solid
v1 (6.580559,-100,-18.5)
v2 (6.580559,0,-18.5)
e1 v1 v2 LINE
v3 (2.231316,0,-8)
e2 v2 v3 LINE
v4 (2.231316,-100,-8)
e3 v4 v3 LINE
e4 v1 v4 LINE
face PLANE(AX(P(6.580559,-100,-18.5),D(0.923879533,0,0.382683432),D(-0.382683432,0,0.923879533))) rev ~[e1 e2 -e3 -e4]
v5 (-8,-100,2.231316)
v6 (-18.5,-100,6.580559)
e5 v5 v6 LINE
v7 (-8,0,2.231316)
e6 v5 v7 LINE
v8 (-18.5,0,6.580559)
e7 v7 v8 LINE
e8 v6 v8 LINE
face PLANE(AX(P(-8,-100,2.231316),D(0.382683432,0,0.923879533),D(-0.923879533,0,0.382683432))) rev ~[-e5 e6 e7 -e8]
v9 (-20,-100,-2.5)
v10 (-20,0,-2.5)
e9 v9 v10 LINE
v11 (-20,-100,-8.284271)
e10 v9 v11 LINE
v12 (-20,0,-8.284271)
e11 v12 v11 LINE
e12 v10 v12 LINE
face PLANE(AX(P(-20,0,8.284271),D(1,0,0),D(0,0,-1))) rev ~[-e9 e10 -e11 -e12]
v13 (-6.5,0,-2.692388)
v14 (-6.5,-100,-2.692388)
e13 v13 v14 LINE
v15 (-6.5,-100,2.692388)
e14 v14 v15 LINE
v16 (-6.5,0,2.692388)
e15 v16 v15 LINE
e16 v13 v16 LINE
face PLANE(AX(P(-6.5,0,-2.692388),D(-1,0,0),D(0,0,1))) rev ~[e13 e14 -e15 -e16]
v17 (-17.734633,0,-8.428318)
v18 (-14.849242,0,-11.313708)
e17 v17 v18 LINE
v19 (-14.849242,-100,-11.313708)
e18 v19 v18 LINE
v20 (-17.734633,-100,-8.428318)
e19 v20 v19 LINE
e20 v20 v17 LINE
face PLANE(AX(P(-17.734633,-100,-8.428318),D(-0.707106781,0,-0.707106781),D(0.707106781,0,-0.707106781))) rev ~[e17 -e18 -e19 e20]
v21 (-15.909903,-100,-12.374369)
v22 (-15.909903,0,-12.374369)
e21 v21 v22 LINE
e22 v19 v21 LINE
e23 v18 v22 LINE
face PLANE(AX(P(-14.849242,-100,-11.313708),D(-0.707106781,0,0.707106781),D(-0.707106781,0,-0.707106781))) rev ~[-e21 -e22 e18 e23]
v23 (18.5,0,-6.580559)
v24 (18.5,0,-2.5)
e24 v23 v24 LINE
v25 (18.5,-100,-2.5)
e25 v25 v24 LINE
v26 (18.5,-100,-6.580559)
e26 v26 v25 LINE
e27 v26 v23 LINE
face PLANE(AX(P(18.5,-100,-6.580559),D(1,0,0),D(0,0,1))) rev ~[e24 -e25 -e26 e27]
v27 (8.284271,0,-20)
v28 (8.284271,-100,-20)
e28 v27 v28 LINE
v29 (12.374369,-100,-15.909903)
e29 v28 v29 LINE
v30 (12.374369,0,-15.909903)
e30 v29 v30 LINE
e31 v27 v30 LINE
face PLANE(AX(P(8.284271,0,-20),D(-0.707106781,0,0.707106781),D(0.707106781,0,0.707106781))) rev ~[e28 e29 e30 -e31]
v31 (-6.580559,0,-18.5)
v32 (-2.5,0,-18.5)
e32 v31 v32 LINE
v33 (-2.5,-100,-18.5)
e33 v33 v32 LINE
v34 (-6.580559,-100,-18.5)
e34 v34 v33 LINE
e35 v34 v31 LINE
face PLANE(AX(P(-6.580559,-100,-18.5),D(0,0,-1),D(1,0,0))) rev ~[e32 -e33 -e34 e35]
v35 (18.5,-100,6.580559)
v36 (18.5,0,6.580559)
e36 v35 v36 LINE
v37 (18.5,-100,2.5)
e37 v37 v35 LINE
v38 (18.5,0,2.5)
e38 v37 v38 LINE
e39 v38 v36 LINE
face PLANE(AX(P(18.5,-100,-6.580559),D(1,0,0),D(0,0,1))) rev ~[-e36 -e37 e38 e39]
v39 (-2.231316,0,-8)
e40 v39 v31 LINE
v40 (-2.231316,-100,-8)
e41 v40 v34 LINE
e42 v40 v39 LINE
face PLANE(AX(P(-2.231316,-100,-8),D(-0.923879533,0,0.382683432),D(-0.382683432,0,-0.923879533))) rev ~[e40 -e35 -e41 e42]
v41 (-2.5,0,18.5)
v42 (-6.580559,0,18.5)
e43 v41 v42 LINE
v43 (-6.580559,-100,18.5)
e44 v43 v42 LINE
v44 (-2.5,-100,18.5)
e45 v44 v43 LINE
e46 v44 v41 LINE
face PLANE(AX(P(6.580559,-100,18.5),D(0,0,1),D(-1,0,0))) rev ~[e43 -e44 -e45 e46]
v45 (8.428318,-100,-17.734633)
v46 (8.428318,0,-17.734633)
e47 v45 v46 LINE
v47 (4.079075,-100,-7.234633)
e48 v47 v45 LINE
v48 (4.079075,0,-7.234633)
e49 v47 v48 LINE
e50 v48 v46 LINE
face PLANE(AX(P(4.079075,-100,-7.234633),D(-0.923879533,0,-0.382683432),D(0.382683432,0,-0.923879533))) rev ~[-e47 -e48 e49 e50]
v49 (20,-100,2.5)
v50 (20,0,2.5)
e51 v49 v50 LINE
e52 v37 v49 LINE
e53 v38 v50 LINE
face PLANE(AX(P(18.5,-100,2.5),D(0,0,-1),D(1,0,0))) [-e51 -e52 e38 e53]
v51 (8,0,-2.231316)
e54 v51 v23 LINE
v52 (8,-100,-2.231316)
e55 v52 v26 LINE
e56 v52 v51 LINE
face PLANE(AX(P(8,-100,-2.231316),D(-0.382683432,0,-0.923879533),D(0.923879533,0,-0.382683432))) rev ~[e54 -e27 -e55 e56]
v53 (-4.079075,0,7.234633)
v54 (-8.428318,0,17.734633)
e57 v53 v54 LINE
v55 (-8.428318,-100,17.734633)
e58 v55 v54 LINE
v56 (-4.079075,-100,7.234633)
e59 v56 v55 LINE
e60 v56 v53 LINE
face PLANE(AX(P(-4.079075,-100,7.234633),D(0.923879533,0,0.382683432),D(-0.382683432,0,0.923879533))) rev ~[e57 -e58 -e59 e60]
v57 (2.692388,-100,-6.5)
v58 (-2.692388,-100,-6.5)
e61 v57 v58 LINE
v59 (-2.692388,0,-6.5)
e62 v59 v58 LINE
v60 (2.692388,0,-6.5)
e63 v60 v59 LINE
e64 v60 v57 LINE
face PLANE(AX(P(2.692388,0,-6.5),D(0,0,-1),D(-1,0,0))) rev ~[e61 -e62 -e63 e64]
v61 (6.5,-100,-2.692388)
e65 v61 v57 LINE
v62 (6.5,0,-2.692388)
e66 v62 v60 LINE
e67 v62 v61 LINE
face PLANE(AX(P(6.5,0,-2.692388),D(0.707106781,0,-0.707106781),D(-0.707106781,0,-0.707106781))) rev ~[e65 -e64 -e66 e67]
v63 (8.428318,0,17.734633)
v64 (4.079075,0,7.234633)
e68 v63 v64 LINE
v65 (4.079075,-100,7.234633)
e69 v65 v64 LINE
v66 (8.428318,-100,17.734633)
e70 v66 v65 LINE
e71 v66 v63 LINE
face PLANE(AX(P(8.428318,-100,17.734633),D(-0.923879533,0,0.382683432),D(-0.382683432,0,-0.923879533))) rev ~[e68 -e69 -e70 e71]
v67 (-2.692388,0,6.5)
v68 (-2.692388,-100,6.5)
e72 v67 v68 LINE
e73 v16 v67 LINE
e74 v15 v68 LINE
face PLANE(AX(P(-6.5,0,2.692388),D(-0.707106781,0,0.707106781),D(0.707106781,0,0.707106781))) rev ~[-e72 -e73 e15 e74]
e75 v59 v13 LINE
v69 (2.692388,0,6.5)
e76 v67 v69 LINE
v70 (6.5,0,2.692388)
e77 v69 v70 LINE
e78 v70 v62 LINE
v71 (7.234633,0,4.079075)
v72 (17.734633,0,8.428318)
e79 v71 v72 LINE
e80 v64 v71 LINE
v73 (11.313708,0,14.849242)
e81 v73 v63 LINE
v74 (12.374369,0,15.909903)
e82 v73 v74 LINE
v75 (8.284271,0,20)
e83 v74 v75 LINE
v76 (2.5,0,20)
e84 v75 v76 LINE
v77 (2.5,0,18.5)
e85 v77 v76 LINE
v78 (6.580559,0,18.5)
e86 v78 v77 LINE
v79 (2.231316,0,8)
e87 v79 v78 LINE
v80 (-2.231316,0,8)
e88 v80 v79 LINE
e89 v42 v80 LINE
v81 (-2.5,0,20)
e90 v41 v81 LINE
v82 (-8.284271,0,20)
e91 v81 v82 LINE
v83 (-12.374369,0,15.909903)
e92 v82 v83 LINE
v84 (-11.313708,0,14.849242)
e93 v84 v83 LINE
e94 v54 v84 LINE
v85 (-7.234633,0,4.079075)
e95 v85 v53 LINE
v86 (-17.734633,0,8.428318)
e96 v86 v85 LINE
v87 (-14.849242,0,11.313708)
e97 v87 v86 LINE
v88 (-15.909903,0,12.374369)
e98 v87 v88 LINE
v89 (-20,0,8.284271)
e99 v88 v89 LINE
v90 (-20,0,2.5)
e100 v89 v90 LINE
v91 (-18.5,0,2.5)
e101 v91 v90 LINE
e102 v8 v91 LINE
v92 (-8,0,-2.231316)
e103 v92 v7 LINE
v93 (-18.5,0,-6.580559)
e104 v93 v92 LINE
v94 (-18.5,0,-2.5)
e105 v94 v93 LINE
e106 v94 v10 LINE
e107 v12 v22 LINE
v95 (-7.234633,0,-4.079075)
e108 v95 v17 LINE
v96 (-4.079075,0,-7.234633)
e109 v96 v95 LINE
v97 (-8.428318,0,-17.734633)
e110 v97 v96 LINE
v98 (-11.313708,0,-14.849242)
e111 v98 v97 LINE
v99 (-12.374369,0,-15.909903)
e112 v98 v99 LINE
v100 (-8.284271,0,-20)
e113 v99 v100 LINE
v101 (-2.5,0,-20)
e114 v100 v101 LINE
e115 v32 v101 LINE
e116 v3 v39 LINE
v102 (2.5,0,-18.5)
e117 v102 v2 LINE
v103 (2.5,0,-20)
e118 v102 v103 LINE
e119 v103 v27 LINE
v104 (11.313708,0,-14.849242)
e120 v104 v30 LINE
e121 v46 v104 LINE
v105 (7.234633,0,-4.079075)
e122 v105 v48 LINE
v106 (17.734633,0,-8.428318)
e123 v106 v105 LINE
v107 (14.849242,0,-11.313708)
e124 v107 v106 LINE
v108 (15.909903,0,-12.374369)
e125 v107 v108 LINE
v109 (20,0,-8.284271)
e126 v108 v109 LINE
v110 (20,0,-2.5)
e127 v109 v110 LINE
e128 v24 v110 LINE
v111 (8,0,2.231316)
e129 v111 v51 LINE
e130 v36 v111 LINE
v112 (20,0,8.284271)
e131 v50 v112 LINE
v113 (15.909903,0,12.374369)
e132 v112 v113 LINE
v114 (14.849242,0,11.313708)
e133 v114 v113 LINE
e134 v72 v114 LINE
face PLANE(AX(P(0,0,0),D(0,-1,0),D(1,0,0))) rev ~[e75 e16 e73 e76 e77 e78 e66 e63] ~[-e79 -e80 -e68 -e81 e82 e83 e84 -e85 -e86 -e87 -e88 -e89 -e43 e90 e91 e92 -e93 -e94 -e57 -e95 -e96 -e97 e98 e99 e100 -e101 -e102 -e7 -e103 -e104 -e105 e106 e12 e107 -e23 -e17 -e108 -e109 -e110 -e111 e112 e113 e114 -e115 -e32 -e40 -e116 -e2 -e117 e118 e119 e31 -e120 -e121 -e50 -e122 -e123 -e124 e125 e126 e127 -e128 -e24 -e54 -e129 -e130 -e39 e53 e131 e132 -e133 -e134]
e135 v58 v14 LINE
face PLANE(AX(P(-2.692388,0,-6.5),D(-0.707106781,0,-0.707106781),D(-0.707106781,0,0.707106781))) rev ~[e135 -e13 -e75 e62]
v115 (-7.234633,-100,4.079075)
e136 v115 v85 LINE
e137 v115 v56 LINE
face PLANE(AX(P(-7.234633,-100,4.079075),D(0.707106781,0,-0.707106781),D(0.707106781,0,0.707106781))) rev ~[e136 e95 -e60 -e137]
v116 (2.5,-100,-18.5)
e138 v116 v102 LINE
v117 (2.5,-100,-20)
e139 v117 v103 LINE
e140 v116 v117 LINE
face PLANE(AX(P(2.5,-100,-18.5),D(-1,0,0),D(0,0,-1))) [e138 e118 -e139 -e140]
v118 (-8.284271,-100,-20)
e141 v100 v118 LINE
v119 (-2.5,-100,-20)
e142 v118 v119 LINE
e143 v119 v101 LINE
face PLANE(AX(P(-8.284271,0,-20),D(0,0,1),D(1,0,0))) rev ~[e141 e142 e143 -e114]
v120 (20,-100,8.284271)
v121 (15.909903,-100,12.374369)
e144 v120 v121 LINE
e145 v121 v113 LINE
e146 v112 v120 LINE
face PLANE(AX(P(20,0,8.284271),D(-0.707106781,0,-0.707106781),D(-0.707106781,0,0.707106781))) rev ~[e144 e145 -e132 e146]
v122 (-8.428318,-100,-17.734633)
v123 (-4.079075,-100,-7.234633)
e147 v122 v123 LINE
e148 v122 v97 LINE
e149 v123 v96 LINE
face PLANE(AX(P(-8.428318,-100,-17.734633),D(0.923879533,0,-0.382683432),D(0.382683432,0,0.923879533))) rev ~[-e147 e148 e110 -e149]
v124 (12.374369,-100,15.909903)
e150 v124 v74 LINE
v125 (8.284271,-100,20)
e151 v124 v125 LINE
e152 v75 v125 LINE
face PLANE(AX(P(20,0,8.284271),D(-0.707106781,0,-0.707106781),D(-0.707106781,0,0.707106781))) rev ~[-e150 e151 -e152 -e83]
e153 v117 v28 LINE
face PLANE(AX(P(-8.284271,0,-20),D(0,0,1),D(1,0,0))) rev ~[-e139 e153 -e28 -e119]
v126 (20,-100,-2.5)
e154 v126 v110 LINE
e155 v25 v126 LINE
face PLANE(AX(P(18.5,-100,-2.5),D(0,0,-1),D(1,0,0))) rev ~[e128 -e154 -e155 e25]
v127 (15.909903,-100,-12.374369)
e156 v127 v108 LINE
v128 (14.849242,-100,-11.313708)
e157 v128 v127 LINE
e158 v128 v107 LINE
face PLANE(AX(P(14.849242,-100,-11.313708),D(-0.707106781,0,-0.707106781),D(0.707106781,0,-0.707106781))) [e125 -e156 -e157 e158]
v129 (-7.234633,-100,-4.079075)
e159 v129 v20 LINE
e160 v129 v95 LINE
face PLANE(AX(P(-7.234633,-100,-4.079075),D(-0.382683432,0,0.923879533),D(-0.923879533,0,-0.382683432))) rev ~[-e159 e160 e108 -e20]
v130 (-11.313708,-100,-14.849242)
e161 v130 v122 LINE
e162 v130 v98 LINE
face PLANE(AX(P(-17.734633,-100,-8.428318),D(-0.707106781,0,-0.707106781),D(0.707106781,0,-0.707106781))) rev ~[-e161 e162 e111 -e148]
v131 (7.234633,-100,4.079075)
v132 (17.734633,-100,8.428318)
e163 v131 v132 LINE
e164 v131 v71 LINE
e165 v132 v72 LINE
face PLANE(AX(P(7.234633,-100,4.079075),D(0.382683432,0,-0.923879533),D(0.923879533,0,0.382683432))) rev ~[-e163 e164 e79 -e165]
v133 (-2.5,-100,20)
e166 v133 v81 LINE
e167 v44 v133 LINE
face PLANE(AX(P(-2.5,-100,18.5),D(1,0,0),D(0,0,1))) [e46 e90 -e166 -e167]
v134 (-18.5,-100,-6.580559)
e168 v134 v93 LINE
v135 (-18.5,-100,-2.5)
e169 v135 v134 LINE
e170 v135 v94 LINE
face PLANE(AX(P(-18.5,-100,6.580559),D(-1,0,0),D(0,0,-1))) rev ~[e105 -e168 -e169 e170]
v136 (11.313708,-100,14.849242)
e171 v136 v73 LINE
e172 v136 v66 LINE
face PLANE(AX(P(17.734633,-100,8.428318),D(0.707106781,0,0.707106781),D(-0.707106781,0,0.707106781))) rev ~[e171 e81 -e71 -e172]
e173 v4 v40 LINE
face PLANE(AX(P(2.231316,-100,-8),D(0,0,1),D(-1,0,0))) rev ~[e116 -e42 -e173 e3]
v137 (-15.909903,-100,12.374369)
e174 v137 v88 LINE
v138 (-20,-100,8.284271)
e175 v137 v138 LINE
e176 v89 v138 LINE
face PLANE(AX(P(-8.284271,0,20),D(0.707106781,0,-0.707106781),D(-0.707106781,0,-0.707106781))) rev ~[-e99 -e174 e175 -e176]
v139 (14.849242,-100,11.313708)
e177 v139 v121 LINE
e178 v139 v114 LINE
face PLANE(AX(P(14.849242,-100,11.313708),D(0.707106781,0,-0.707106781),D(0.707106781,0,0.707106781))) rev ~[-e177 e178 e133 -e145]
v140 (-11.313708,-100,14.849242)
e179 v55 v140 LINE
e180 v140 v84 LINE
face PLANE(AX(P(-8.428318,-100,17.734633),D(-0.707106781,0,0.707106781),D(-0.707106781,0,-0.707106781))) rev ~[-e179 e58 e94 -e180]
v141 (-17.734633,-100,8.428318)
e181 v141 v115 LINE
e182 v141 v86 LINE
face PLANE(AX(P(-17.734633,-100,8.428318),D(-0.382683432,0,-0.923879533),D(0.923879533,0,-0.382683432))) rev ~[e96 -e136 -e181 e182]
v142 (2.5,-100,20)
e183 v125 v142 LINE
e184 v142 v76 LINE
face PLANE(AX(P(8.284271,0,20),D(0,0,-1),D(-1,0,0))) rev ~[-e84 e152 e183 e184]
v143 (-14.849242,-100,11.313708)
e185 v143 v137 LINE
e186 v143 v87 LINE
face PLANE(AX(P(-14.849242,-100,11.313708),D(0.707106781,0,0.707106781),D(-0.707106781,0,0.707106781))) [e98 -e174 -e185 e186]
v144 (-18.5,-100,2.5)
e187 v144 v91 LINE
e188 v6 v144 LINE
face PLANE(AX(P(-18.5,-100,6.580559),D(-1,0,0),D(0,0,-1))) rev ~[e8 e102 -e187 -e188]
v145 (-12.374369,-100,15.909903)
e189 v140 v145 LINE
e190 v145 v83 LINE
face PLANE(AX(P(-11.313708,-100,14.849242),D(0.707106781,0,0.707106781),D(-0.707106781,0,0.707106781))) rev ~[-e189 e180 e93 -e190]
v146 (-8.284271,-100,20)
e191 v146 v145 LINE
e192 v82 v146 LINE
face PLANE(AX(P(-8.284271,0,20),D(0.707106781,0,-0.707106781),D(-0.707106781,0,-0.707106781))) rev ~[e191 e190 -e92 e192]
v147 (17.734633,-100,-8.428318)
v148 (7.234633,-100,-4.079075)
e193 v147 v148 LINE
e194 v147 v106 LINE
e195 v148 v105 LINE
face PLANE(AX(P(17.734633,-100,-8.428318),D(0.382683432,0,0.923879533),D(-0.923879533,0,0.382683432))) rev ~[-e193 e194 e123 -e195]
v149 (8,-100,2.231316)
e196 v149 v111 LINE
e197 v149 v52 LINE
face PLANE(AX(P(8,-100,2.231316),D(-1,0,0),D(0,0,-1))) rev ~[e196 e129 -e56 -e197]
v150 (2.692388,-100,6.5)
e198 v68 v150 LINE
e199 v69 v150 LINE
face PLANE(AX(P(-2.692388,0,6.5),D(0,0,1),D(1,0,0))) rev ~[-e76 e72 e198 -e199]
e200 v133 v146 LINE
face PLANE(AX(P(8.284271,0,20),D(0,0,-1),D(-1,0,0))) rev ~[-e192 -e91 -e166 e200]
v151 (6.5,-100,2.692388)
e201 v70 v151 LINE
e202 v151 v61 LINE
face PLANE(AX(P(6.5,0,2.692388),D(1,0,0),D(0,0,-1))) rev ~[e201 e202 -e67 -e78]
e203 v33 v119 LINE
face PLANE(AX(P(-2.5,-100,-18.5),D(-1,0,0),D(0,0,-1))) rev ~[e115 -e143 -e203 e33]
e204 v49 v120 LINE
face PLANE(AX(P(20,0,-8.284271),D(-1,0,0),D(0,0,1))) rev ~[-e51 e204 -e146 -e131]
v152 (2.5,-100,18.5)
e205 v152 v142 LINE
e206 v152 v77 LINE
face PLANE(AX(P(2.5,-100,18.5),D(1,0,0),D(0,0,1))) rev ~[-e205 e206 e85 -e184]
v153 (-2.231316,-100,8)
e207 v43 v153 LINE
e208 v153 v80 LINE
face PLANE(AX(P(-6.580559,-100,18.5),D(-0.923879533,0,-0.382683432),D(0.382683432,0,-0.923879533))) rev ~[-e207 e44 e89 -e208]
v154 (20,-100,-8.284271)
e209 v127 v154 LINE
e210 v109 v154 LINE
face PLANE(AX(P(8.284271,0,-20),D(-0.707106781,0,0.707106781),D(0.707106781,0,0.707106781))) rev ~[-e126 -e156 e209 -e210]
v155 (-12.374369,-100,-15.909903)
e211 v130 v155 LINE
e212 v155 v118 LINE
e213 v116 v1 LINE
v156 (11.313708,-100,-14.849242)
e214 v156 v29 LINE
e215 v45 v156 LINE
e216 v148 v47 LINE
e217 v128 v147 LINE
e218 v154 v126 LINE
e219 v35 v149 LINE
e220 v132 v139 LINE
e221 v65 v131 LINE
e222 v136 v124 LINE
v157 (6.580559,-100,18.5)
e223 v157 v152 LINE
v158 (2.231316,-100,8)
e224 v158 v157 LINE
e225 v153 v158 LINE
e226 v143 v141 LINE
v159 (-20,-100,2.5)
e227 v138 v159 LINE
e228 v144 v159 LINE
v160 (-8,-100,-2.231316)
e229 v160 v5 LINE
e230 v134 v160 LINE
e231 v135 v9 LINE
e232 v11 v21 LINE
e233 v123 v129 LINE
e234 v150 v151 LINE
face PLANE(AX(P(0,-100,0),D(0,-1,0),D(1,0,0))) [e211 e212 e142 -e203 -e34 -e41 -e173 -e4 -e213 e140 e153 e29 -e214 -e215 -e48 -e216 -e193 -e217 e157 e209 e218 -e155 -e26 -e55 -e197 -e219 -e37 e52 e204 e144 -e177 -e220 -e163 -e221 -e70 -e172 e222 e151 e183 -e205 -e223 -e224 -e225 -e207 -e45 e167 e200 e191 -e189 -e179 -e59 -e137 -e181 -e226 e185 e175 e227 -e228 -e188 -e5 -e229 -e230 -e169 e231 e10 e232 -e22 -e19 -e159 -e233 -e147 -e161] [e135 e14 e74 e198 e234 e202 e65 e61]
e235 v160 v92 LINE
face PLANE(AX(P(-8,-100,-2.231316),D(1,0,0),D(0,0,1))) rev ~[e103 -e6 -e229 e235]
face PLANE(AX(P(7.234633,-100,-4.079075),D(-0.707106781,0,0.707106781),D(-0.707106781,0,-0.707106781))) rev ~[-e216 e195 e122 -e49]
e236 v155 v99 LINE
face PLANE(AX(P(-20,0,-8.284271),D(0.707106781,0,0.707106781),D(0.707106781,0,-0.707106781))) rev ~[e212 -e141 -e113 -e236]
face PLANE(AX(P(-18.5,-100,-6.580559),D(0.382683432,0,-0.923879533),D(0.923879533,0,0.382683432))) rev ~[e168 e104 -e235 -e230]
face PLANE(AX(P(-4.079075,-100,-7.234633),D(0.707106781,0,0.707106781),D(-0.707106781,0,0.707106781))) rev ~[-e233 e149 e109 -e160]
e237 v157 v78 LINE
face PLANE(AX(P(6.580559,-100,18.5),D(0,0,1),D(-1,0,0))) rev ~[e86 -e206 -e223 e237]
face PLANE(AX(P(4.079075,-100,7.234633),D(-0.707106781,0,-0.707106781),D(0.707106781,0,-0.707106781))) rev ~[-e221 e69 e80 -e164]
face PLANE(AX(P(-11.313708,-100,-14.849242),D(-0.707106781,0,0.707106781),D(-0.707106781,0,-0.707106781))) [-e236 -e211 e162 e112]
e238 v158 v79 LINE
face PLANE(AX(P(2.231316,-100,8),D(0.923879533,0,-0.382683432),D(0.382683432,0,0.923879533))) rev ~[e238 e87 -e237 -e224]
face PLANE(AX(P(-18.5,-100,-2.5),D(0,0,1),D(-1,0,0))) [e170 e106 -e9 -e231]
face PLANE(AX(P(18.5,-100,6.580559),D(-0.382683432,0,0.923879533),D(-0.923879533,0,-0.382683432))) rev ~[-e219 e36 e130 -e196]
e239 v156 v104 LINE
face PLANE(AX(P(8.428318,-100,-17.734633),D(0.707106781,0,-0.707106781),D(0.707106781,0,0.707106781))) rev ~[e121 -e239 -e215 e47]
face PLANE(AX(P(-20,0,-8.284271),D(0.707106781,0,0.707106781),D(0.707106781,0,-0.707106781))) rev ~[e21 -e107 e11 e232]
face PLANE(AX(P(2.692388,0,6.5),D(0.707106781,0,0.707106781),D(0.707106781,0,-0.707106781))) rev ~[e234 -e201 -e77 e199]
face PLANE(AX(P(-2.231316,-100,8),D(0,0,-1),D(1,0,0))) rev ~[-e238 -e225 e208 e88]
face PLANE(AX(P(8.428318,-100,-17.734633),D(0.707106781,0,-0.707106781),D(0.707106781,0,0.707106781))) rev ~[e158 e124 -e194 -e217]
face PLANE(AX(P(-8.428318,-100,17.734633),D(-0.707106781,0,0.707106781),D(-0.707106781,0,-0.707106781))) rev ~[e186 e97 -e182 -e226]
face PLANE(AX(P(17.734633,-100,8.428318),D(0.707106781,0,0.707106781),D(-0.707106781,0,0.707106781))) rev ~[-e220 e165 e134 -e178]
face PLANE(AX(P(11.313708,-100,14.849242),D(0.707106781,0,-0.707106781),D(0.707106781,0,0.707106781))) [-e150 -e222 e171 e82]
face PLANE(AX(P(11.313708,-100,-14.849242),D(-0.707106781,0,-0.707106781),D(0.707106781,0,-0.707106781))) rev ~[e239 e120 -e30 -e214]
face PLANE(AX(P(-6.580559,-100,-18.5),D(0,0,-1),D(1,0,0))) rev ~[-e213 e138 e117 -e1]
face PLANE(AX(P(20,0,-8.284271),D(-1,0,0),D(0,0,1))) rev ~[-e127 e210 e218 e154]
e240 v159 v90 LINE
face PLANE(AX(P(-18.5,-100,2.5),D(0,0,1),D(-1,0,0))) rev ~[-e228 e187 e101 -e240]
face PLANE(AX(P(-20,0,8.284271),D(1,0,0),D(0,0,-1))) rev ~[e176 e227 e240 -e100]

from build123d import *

# Parameters (mm, degrees)
F1_DEPTH        = 100
F3_DEPTH        = 100.001
F3_COPIES_COUNT = 8
F4_W            = 5
F4_H            = 1.5
F5_DEPTH        = 100.001
F5_COPIES_COUNT = 8


# Not quite as in the source:
# - a pattern or mirror of a feature is missing from the dataset's text; its kind, count and spacing are read off the source's solid


with BuildPart() as f1:
    # F0 (on Front) → F1 (new body)
    with BuildSketch(Plane.XZ):
        Polygon((8.2842712475, 20), (-8.2842712475, 20), (-20, 8.2842712475), (-20, -8.2842712475), (-8.2842712475, -20), (8.2842712475, -20), (20, -8.2842712475), (20, 8.2842712475), align=None)
        Polygon((-6.5, 2.6923881554), (-2.6923881554, 6.5), (2.6923881554, 6.5), (6.5, 2.6923881554), (6.5, -2.6923881554), (2.6923881554, -6.5), (-2.6923881554, -6.5), (-6.5, -2.6923881554), align=None, mode=Mode.SUBTRACT)
    extrude(amount=F1_DEPTH)

    # F2 (on face) → F3 (cut, through all)
    with BuildSketch(Plane.XZ.offset(100)):
        Polygon((-6.5805587036, 18.5), (-2.2313162987, 8), (2.2313162987, 8), (6.5805587036, 18.5), align=None)
    f3 = extrude(amount=-F3_DEPTH, mode=Mode.SUBTRACT)

    # F3_copies: F3 ×8 about axis
    f3_copies_axis = Axis((0, 0, 0), (0, 1, 0))
    for i in range(1, F3_COPIES_COUNT):
        add(f3.rotate(f3_copies_axis, i * 360 / F3_COPIES_COUNT), mode=Mode.SUBTRACT)

    # F4 (on face) → F5 (cut, through all)
    with BuildSketch(Plane.XZ.offset(100)):
        with Locations((0, 19.25)):
            Rectangle(F4_W, F4_H)
    f5 = extrude(amount=-F5_DEPTH, mode=Mode.SUBTRACT)

    # F5_copies: F5 ×8 about axis
    f5_copies_axis = Axis((0, 0, 0), (0, 1, 0))
    for i in range(1, F5_COPIES_COUNT):
        add(f5.rotate(f5_copies_axis, i * 360 / F5_COPIES_COUNT), mode=Mode.SUBTRACT)


solid = f1.part
